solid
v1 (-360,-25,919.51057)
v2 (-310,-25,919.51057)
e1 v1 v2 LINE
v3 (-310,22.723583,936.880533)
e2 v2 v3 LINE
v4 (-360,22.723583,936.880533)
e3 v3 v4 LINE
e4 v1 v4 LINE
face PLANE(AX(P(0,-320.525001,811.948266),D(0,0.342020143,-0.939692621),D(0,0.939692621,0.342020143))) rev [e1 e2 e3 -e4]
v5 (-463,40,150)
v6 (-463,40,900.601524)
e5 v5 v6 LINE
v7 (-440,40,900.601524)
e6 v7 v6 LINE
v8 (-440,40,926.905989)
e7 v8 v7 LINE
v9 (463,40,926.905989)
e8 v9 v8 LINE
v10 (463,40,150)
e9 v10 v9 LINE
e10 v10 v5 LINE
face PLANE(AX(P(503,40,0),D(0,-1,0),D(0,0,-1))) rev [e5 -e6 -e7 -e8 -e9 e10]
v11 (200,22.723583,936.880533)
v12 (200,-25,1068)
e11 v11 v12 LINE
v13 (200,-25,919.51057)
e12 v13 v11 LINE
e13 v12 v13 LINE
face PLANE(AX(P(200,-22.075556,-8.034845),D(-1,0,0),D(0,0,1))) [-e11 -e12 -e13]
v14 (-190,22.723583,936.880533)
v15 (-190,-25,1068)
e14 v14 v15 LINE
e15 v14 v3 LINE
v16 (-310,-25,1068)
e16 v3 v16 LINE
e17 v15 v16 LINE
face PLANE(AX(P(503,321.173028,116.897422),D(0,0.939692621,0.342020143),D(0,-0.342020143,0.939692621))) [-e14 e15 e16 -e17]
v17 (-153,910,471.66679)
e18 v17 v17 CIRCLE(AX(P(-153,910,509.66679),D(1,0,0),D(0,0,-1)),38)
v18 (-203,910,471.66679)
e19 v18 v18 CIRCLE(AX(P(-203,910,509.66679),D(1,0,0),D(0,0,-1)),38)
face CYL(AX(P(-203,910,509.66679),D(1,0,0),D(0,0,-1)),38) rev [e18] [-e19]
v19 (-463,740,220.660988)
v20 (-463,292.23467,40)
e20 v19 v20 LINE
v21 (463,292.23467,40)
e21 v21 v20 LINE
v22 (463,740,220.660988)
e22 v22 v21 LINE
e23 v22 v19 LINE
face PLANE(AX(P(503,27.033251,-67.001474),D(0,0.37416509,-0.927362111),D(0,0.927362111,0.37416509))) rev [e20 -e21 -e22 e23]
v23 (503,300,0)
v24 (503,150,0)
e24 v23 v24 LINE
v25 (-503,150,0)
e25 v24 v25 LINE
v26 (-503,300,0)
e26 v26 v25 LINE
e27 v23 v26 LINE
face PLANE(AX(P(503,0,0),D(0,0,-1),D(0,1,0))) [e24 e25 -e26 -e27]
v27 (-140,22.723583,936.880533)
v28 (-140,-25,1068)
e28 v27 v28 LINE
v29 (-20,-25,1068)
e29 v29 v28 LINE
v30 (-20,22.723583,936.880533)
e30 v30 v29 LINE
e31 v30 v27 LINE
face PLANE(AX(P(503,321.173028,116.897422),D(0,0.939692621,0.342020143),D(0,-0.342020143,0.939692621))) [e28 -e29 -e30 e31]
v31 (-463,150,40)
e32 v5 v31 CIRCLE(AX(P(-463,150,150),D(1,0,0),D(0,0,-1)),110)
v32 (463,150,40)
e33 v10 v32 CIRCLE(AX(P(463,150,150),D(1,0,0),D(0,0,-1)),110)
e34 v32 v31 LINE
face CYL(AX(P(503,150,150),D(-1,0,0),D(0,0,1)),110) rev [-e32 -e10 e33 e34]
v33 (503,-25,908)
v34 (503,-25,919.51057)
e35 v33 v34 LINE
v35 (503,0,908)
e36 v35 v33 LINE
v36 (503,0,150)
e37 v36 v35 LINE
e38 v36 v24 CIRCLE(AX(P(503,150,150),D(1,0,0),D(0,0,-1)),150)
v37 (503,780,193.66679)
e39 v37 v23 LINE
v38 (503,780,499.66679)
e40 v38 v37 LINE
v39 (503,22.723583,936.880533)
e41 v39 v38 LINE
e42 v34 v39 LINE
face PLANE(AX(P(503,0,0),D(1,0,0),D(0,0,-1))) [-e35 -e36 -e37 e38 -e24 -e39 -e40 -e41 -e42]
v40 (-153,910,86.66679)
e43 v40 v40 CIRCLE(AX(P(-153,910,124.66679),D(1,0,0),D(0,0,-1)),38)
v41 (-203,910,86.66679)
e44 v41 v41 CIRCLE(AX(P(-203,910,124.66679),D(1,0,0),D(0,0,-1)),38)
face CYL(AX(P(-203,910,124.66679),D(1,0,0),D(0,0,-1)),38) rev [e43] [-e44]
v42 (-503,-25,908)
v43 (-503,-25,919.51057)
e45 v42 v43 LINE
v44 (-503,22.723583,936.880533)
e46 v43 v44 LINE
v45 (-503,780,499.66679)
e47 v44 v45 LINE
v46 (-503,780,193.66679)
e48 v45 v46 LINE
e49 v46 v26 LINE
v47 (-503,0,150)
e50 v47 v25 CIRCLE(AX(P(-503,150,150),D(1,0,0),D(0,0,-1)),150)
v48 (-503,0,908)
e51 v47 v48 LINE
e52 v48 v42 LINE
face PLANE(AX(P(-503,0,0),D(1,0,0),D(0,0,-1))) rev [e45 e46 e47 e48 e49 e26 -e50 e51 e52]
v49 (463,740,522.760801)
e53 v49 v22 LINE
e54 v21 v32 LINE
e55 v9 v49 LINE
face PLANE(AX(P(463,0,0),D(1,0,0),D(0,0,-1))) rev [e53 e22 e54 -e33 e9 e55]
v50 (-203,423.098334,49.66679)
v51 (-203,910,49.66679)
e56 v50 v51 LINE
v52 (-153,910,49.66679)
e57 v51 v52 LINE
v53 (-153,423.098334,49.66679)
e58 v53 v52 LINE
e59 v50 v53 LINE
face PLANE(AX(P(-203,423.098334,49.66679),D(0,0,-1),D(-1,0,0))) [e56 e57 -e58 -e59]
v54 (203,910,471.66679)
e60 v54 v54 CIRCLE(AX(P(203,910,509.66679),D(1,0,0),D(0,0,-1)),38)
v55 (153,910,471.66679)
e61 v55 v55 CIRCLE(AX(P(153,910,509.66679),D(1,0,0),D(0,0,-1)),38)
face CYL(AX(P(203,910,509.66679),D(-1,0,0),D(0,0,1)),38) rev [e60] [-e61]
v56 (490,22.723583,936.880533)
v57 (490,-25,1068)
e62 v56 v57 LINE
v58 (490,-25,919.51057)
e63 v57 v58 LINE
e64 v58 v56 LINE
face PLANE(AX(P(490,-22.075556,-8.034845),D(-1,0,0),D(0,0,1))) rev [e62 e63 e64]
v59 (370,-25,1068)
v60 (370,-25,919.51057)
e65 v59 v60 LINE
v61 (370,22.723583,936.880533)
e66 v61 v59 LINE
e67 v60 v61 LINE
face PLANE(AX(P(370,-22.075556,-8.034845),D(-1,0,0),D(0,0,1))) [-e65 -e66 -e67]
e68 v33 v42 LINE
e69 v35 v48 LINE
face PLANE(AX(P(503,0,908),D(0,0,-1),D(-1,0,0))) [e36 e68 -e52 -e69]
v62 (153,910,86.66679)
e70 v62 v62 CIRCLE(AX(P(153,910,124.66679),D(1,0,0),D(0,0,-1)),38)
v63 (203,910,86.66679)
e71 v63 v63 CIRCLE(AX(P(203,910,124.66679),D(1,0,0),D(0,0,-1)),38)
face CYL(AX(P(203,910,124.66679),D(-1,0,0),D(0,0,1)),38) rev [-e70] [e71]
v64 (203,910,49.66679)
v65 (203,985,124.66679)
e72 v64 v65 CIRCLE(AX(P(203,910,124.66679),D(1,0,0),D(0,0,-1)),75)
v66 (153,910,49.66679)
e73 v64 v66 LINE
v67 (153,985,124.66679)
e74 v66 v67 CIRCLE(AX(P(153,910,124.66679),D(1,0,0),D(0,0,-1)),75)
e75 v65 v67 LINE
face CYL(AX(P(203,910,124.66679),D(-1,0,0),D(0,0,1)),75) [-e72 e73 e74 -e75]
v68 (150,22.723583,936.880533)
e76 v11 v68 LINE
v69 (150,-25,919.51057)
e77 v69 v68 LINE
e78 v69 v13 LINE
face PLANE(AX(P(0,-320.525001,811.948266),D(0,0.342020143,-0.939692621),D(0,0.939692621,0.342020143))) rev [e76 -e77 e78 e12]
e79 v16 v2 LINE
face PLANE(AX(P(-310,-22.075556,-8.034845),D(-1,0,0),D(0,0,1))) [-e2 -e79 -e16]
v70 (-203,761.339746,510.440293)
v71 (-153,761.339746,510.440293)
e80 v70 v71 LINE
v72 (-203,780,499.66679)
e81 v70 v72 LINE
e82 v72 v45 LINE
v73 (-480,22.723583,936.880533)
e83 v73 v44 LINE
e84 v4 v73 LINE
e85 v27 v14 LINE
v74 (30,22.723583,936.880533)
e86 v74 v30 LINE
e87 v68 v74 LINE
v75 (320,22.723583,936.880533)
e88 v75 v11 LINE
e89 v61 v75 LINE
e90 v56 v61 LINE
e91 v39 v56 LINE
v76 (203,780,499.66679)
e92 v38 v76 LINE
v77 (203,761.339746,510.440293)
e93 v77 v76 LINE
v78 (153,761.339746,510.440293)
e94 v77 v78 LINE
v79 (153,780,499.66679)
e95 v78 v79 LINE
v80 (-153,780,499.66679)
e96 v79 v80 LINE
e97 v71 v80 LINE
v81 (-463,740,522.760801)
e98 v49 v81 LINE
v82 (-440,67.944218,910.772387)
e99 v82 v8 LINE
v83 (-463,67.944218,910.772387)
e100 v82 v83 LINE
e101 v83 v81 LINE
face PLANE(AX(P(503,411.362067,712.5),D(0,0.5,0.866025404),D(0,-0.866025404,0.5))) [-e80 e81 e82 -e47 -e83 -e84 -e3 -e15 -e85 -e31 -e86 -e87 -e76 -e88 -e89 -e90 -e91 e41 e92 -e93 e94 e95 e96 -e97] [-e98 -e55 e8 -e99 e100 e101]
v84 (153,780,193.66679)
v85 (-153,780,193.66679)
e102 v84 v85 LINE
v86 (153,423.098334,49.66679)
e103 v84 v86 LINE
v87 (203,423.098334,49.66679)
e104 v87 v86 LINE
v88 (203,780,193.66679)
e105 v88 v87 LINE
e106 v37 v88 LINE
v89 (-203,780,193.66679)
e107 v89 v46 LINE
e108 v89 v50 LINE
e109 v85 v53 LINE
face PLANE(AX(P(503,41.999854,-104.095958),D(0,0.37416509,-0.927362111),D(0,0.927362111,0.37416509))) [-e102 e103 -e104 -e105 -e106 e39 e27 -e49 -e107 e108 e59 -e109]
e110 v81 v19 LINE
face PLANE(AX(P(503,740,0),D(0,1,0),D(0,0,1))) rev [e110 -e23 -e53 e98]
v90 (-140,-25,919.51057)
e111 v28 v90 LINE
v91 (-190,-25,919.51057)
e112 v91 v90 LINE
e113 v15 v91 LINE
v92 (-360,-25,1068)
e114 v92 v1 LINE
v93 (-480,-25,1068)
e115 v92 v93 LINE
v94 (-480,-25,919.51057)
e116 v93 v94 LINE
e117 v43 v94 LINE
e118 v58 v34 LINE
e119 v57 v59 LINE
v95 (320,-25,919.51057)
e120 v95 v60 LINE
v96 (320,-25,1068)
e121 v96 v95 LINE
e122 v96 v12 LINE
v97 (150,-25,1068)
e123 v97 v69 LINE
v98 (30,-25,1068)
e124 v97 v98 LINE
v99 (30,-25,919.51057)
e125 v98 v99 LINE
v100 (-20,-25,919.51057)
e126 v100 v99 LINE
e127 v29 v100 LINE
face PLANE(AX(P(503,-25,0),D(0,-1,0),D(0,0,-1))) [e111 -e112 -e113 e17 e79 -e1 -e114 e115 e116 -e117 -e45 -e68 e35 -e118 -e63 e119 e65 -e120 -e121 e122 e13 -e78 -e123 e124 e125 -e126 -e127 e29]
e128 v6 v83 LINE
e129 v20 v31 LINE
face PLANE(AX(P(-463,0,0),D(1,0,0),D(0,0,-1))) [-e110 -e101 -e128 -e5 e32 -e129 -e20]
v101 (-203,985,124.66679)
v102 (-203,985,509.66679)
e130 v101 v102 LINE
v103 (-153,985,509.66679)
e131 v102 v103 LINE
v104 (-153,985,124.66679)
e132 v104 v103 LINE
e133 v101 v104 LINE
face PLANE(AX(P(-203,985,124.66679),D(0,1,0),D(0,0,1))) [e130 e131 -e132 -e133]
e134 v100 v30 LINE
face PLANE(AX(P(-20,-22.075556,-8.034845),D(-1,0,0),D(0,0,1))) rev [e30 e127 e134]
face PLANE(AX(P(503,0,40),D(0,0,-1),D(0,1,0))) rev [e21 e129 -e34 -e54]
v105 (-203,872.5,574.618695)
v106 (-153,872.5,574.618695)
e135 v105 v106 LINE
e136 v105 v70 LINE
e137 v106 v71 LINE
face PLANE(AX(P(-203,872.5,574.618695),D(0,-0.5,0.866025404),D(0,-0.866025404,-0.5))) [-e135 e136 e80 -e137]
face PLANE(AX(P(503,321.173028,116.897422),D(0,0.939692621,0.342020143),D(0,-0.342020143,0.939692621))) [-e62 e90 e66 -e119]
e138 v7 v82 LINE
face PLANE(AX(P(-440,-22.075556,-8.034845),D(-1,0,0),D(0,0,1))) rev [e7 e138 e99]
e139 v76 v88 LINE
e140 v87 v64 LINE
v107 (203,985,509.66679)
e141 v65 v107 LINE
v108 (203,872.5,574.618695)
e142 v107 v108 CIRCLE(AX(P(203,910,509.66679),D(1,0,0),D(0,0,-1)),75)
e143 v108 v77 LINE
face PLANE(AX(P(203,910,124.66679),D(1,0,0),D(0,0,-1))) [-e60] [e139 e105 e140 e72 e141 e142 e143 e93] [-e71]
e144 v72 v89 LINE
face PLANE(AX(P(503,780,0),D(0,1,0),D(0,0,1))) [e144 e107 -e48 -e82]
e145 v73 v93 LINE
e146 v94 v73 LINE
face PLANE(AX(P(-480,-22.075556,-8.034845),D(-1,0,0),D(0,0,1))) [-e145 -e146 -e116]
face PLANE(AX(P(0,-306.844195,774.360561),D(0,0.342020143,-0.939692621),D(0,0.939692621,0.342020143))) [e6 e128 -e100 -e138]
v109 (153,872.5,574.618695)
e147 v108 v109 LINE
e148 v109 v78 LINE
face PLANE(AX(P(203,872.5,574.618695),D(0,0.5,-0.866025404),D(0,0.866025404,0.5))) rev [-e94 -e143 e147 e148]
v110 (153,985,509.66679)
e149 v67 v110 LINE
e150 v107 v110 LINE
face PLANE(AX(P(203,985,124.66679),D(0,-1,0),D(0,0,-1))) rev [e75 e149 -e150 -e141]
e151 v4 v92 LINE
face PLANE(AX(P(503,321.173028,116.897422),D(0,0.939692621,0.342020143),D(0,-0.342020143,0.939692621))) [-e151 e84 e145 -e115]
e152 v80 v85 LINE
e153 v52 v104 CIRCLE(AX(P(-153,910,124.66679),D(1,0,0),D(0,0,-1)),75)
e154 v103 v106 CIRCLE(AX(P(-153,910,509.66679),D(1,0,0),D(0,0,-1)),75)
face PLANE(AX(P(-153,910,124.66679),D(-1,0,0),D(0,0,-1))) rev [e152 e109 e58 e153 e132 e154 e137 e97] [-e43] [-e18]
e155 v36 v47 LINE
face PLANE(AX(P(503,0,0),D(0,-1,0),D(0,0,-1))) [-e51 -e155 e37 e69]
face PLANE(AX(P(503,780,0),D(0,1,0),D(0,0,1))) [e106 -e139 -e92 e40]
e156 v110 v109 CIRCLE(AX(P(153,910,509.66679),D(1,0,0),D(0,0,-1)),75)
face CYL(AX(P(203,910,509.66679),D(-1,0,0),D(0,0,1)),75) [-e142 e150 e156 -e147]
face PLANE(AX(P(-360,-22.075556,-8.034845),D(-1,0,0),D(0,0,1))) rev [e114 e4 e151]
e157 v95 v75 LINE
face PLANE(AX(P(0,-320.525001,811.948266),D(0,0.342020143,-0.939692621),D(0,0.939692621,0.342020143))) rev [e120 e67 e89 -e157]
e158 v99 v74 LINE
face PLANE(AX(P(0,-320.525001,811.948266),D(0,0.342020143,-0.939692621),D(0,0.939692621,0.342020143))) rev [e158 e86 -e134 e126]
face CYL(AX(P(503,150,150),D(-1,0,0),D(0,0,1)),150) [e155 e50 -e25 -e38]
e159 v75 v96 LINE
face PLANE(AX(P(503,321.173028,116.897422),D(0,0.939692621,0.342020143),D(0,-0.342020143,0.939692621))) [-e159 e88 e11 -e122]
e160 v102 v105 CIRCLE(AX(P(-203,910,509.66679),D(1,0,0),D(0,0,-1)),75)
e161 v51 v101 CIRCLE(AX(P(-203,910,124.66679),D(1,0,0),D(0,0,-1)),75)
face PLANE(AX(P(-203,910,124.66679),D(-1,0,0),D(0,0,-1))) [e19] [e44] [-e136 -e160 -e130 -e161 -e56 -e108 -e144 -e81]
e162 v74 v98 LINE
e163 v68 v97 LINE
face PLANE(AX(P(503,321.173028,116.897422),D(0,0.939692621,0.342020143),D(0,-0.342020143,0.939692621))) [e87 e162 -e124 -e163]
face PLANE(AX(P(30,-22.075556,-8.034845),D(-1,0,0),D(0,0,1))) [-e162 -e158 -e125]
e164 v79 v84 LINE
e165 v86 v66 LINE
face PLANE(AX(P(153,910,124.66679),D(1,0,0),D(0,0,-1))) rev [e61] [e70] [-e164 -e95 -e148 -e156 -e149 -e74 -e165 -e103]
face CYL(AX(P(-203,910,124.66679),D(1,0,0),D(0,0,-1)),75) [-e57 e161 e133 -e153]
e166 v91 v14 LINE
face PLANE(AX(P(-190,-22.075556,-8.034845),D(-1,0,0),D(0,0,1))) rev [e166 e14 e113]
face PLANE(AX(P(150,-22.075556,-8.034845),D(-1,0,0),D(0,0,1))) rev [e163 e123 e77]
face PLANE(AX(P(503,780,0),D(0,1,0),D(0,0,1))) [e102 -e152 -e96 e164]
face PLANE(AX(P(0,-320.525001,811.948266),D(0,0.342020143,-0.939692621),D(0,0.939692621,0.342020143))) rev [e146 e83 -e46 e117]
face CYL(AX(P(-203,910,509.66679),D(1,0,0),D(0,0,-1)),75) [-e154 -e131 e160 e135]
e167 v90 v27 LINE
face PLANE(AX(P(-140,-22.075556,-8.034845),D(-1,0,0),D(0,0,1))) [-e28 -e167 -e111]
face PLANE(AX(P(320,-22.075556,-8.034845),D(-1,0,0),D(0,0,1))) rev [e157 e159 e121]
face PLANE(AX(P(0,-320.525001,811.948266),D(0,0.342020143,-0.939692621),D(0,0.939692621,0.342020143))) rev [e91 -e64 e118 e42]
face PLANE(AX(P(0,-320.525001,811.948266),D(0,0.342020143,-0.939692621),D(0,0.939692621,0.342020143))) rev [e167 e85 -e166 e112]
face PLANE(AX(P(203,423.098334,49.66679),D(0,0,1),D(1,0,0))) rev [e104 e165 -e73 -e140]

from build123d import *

# Parameters (mm, degrees)
BOSS_EXTRUDE1_DEPTH = 503
SKETCH2_W           = 23
SKETCH2_H           = 139.534422093
SKETCH2_W_2         = 50
SKETCH2_W_3         = 13
CUT_EXTRUDE1_DEPTH  = 1170.669741252
SHELL1_START        = -463
SHELL1_DEPTH        = 926
SHELL1_START_2      = -440
SHELL1_2_DEPTH      = 903
BOSS_EXTRUDE2_START = 153
SKETCH4_R           = 38
BOSS_EXTRUDE2_DEPTH = 50


# Read off the part's stored shape, not the designer's step: Shell1
with BuildPart() as part:
    # Sketch1 → Boss-Extrude1 (new, symmetric)
    with BuildSketch(Plane(origin=(0, 0, 0), x_dir=(0, 0, -1), z_dir=(1, 0, 0))):
        with BuildLine():
            Line((-150, 0), (-950, 0))
            Line((-950, 0), (-499.666790032, 780))
            Line((-499.666790032, 780), (-193.666790032, 780))
            Line((-193.666790032, 780), (0, 300))
            Line((0, 300), (0, 150))
            ThreePointArc((0, 150), (-43.933982822, 43.933982822), (-150, 0))
        make_face()
        Polygon((-908, -25), (-908, 0), (-950, 0), (-936.880533213, 22.723583043), (-1068, -25), align=None)
    extrude(amount=BOSS_EXTRUDE1_DEPTH, both=True)

    # Sketch2 → Cut-Extrude1 (cut, through all)
    with BuildSketch(Plane(origin=(0, 321.173028034, 116.897422253), x_dir=(1, 0, 0), z_dir=(0, 0.9396926207859103, 0.34202014332566333))):
        with Locations((-491.5, -942.375011536)):
            Rectangle(SKETCH2_W, SKETCH2_H)
        with Locations((-335, -942.375011536)):
            Rectangle(SKETCH2_W_2, SKETCH2_H)
        with Locations((-165, -942.375011536)):
            Rectangle(SKETCH2_W_2, SKETCH2_H)
        with Locations((5, -942.375011536)):
            Rectangle(SKETCH2_W_2, SKETCH2_H)
        with Locations((175, -942.375011536)):
            Rectangle(SKETCH2_W_2, SKETCH2_H)
        with Locations((345, -942.375011536)):
            Rectangle(SKETCH2_W_2, SKETCH2_H)
        with Locations((496.5, -942.375011536)):
            Rectangle(SKETCH2_W_3, SKETCH2_H)
    extrude(amount=-CUT_EXTRUDE1_DEPTH, mode=Mode.SUBTRACT)

    # Shell1 outline → Shell1 (cut)
    with BuildSketch(Plane.YZ.offset(SHELL1_START)):
        with BuildLine():
            Line((67.944218037, 910.772387426), (40, 900.601523841))
            Line((40, 900.601523841), (40, 150))
            ThreePointArc((40, 150), (72.218254069, 72.218254069), (150, 40))
            Line((150, 40), (292.234669594, 40))
            Line((292.234669594, 40), (740, 220.660987974))
            Line((740, 220.660987974), (740, 522.7608008))
            Line((740, 522.7608008), (67.944218037, 910.772387426))
        make_face()
    extrude(amount=SHELL1_DEPTH, mode=Mode.SUBTRACT)

    # Shell1 2 outline → Shell1 2 (cut)
    with BuildSketch(Plane.YZ.offset(SHELL1_START_2)):
        Polygon((67.944218037, 910.772387426), (40, 926.905989232), (40, 900.601523841), align=None)
    extrude(amount=SHELL1_2_DEPTH, mode=Mode.SUBTRACT)

    # Sketch4 → Boss-Extrude2 (add)
    with BuildSketch(Plane(origin=(0, 0, 0), x_dir=(0, 0, -1), z_dir=(1, 0, 0)).offset(BOSS_EXTRUDE2_START)):
        with BuildLine():
            Line((-49.666790032, 423.098334058), (-49.666790032, 910))
            ThreePointArc((-49.666790032, 910), (-71.633781443, 963.033008589), (-124.666790032, 985))
            Line((-124.666790032, 985), (-509.666790032, 985))
            ThreePointArc((-509.666790032, 985), (-574.618695316, 947.5), (-574.618695316, 872.5))
            Line((-574.618695316, 872.5), (-510.440292724, 761.339745962))
            Line((-510.440292724, 761.339745962), (-499.666790032, 780))
            Line((-499.666790032, 780), (-193.666790032, 780))
            Line((-193.666790032, 780), (-49.666790032, 423.098334058))
        make_face()
        with Locations((-509.666790032, 910)):
            Circle(SKETCH4_R, mode=Mode.SUBTRACT)
        with Locations((-124.666790032, 910)):
            Circle(SKETCH4_R, mode=Mode.SUBTRACT)
    boss_extrude2 = extrude(amount=BOSS_EXTRUDE2_DEPTH)

    # Mirror1: Boss-Extrude2 across plane
    add(boss_extrude2.mirror(Plane(origin=(0, 0, 0), x_dir=(0, 0, 1), z_dir=(1, 0, 0))))


solid = part.part
